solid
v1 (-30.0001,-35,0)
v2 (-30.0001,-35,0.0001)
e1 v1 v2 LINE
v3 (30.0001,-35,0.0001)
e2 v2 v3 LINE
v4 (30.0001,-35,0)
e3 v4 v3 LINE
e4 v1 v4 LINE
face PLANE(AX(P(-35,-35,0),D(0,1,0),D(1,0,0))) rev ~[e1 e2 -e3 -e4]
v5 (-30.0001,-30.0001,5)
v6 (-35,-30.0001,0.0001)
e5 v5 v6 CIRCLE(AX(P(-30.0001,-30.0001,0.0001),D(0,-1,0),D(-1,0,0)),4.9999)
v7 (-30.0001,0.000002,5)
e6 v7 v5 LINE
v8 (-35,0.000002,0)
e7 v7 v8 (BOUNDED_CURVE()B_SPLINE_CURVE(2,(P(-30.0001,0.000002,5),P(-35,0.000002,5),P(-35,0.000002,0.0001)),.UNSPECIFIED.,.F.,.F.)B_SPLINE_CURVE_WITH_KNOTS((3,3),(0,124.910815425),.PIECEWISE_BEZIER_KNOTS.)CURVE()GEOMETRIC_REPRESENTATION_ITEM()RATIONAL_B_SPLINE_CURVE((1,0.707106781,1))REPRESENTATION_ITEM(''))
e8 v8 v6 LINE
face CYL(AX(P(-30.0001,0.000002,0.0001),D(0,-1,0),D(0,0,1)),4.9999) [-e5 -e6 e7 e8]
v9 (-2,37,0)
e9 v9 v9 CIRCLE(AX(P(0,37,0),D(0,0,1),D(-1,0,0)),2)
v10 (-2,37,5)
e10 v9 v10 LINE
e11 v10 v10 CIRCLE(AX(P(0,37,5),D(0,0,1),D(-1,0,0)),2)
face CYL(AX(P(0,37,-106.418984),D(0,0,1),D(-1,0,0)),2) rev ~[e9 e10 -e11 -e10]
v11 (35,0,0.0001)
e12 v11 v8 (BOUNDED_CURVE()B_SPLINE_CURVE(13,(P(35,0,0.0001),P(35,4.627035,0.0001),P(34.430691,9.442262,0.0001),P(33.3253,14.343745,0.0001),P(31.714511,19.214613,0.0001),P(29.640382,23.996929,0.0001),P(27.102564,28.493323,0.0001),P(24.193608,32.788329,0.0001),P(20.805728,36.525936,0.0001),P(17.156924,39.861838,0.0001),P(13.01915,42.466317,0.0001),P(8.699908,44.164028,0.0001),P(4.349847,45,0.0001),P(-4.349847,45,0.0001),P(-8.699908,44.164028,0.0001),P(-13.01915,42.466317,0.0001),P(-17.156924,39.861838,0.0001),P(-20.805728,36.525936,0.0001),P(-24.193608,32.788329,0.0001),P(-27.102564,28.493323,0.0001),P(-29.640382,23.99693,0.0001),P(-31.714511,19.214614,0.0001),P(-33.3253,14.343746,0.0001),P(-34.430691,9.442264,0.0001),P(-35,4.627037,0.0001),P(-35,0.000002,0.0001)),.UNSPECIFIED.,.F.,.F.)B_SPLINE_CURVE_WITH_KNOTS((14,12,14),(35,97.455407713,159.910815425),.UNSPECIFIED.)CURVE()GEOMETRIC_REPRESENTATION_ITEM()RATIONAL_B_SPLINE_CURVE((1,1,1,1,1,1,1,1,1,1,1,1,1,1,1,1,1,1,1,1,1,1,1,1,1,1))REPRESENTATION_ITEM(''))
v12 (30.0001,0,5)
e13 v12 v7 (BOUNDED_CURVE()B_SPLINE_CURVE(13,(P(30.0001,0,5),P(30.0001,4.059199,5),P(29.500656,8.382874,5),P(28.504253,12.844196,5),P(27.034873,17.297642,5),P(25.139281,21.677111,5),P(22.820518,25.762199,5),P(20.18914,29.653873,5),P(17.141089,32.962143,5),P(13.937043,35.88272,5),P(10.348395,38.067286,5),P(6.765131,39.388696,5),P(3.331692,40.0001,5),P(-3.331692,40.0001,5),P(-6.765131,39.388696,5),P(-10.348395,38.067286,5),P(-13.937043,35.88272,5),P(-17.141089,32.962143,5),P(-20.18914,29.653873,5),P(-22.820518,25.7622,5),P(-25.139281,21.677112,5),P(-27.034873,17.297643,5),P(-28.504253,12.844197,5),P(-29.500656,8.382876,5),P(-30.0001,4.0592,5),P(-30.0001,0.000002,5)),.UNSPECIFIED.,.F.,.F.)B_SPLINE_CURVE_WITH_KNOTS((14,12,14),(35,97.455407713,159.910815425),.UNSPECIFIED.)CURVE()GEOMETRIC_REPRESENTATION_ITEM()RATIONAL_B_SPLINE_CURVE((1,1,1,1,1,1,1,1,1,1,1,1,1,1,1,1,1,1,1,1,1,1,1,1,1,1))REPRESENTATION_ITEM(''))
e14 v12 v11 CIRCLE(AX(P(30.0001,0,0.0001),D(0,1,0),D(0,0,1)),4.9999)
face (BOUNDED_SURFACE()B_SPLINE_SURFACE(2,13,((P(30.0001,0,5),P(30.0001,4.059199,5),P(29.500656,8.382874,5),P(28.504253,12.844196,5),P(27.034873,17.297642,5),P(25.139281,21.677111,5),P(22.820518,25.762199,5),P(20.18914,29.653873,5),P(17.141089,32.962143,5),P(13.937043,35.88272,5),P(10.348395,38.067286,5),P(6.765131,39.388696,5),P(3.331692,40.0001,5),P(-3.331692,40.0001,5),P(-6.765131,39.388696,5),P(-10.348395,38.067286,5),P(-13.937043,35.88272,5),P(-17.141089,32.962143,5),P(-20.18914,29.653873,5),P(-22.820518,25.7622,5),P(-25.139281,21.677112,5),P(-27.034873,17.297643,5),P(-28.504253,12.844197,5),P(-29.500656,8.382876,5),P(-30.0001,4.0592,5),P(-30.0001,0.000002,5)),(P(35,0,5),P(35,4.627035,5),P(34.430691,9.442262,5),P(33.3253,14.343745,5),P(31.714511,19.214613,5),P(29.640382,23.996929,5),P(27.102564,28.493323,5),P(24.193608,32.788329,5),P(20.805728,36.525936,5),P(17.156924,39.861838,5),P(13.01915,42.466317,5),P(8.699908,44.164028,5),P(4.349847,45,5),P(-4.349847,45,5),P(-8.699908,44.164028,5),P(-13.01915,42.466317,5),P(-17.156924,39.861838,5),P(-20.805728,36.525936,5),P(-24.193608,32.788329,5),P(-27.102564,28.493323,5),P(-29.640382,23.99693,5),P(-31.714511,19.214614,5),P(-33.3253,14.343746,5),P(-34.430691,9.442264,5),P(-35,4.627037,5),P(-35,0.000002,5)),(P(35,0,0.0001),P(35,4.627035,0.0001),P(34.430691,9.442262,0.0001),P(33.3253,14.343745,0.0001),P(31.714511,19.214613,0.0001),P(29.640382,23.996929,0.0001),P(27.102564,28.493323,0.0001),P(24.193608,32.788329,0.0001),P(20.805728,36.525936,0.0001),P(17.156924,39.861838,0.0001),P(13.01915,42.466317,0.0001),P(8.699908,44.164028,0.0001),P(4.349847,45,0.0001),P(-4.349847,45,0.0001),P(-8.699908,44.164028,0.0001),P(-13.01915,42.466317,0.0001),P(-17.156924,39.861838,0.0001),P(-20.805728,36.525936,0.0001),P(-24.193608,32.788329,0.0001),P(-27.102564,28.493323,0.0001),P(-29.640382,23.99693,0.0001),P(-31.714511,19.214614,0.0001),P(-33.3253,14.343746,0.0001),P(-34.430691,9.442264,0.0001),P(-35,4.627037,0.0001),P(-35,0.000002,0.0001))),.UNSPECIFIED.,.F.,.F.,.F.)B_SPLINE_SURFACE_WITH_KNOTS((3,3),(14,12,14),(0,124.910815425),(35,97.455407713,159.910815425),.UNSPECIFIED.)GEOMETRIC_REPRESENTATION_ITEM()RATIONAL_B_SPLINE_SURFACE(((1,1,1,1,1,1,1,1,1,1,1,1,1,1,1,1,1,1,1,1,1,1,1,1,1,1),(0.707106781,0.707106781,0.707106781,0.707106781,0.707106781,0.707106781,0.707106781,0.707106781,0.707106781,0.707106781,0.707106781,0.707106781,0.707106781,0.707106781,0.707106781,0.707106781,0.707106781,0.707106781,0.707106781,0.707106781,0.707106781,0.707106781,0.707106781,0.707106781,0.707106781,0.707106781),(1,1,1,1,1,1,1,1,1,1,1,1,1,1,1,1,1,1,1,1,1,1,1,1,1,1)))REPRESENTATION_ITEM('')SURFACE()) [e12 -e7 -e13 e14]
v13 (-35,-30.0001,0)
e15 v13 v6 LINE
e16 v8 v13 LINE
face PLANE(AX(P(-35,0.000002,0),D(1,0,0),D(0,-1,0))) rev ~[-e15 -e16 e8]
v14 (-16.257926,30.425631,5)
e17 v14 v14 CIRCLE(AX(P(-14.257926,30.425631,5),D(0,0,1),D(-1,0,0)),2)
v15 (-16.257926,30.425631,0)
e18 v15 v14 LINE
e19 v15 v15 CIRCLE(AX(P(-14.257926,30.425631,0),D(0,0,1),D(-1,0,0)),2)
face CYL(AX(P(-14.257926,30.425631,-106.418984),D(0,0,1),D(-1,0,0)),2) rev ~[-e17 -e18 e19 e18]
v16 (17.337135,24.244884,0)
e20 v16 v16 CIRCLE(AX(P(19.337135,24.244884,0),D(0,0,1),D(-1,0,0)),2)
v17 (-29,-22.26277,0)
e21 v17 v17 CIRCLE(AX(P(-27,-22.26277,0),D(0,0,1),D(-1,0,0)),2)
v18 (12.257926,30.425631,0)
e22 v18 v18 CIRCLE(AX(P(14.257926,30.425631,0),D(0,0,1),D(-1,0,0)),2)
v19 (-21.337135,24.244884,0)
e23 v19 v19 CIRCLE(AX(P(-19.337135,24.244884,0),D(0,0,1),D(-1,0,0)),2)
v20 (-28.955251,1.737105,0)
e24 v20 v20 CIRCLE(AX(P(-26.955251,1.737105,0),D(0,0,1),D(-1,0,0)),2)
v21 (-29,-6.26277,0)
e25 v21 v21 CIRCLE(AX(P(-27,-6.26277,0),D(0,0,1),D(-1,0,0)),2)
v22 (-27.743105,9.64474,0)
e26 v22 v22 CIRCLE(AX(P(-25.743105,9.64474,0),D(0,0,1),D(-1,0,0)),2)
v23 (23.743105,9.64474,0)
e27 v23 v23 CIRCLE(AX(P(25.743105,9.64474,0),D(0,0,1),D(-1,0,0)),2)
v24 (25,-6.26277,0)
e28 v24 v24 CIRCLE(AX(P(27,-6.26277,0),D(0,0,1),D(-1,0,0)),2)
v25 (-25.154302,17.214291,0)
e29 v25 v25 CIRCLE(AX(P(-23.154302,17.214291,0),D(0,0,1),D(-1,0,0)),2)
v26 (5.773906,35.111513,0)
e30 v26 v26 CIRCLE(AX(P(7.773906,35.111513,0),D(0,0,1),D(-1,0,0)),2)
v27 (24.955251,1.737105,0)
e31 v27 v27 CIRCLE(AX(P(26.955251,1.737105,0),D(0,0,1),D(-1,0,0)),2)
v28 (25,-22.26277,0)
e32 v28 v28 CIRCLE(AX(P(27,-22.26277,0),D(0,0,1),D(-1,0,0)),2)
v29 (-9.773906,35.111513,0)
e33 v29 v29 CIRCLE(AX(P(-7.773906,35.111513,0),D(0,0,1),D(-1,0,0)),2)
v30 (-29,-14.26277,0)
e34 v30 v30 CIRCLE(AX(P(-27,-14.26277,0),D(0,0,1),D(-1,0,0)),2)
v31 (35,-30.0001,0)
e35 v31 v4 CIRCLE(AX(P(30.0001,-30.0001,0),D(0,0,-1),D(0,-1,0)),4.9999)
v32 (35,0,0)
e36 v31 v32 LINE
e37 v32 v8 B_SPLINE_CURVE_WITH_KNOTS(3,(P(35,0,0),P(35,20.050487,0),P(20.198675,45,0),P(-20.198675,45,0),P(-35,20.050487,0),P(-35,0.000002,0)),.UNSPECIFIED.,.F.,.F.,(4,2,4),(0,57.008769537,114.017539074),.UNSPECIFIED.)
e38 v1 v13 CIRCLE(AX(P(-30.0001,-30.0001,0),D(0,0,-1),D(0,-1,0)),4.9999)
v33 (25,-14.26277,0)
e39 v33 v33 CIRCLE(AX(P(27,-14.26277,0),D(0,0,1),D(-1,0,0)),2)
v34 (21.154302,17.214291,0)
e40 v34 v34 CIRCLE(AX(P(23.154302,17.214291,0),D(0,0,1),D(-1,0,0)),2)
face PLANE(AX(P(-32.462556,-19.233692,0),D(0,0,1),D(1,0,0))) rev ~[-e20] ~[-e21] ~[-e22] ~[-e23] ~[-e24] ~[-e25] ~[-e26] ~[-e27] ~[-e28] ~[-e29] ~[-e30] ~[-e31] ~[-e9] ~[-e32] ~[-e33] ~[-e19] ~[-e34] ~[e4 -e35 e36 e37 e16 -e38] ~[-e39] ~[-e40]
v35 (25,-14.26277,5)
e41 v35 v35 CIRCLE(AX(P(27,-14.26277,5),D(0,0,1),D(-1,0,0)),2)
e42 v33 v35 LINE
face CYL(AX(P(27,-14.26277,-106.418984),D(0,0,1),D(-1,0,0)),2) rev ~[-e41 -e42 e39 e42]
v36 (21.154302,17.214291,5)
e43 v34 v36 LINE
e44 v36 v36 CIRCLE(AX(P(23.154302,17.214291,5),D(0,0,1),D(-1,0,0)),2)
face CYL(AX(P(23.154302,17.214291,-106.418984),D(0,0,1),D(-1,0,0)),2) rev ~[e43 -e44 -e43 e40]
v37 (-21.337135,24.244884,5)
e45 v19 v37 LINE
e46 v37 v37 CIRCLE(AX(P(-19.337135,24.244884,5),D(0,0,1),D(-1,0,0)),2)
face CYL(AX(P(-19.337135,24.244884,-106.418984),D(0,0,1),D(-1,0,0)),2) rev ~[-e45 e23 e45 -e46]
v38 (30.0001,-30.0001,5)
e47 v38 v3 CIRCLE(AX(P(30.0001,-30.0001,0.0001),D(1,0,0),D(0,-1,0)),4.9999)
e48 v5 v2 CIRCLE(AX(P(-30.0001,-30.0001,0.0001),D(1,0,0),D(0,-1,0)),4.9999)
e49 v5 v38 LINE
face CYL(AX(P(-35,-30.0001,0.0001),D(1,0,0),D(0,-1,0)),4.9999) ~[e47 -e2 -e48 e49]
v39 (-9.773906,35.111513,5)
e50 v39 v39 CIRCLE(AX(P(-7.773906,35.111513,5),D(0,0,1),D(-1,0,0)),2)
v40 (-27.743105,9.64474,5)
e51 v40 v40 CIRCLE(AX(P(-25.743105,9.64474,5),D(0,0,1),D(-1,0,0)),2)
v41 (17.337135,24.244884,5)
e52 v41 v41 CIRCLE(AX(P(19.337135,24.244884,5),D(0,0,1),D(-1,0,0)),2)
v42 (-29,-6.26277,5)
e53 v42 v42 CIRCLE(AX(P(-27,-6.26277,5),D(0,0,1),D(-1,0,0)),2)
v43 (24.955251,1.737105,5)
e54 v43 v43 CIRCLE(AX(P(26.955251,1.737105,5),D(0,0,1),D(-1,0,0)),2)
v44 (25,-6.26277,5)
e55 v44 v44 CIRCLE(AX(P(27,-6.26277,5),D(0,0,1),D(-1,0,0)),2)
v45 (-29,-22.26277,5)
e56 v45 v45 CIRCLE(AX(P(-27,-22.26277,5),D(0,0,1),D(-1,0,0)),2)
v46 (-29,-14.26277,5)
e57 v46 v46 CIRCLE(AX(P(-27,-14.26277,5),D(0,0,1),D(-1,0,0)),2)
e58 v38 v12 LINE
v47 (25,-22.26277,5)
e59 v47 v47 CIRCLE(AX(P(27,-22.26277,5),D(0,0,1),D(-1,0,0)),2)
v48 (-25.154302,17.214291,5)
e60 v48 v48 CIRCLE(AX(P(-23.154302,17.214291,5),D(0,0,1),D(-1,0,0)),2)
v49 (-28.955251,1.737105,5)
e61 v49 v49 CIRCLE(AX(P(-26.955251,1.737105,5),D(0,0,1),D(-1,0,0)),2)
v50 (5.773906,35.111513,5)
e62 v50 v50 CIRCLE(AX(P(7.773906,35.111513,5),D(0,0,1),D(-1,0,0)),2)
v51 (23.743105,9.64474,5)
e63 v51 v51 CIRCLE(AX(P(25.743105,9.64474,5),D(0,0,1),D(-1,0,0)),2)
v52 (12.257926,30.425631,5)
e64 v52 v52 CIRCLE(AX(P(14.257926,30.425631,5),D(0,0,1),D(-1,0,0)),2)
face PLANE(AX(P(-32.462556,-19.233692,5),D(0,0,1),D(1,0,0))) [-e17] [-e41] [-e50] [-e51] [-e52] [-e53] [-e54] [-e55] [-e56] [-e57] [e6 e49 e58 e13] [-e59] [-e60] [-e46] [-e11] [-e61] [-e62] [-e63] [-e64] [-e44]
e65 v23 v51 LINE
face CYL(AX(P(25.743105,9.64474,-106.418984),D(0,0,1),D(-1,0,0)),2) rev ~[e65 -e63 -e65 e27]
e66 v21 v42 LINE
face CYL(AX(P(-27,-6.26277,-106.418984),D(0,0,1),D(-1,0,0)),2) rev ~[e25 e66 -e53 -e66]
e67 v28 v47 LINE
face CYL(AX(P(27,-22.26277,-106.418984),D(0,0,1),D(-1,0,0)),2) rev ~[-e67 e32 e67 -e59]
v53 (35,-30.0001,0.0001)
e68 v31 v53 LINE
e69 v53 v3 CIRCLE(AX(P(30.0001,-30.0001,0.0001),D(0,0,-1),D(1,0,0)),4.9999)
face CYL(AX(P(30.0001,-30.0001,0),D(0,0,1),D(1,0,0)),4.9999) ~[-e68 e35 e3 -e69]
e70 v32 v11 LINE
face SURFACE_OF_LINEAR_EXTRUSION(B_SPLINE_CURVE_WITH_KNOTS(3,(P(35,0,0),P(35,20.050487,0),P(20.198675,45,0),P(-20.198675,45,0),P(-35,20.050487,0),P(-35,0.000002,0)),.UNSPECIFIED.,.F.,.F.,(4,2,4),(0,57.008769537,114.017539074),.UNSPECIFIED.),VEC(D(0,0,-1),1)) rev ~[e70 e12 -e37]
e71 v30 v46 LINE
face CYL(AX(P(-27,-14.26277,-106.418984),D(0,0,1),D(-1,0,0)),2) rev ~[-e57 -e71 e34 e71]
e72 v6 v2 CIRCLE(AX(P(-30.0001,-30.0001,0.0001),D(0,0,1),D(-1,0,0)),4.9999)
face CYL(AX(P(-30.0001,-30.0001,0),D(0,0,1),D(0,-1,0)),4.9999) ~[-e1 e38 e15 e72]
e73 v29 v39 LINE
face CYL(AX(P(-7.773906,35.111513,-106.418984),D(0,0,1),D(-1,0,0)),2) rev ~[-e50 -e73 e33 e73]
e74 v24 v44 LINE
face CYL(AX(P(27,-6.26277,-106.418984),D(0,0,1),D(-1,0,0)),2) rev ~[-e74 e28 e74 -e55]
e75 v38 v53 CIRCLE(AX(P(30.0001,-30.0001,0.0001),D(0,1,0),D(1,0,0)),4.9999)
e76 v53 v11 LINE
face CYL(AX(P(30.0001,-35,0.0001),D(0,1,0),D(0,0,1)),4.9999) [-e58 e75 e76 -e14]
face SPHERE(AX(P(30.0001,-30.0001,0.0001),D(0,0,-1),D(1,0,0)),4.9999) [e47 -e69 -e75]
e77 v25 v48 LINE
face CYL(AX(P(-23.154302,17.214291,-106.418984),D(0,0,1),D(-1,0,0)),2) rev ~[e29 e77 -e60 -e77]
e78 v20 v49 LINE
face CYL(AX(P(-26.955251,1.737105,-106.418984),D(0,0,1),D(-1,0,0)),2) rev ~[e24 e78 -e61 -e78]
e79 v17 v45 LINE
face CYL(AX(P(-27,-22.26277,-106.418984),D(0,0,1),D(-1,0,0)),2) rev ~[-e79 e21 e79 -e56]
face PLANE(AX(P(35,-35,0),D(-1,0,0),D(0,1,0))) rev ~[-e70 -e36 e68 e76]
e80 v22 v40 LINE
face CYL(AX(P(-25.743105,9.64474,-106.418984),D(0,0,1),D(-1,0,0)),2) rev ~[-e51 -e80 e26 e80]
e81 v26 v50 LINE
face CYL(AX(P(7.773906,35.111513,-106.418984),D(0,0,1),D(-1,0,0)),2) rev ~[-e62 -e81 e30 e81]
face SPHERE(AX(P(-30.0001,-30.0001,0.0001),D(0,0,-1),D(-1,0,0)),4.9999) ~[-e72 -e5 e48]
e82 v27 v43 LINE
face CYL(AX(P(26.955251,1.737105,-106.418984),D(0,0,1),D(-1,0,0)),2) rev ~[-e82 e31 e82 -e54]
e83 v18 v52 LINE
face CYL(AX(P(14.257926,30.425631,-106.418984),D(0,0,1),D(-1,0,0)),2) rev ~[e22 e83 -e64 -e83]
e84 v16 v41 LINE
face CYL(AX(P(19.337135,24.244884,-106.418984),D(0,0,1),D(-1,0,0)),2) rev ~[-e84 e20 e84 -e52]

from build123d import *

# Parameters (mm, degrees)
F1_DEPTH = 5
F2_D     = 4
F3_R     = 4.9999


# Not quite as in the source:
# - a fillet or chamfer is up to 0.001 mm smaller than in the source, because OpenCascade refuses the exact size
# - ends of sketch curves that miss each other by under 0.0002 mm in the source are joined


with BuildPart() as f1:
    # F0 (on Top) → F1 (new body)
    with BuildSketch(Plane.XY):
        with BuildLine():
            Line((-35, 2.1762e-06), (-35, -35))
            Line((-35, -35), (-27, -35))
            Line((-27, -35), (-27, -22.2710574513))
            ThreePointArc((-27, -22.2710574513), (-32.9393385518, -11.8321585422), (-35, 2.1762e-06))
        make_face()
        with BuildLine():
            Line((-27, -22.2710574513), (-27, -35))
            Line((-27, -35), (0, -35))
            ThreePointArc((0, -35), (-14.9250291324, -31.658229663), (-27, -22.2710574513))
        make_face()
        with BuildLine():
            add(Edge.make_bspline(
                [(0, 45), (-20.1986748725, 45), (-35, 20.0504870868), (-35, 2.1762e-06)],
                knots=[0, 0, 0, 0, 57.0087695372, 57.0087695372, 57.0087695372, 57.0087695372], degree=3))
            ThreePointArc((-35, 2.1762e-06), (-28.4666369261, 20.3629708568), (-11.3056830814, 33.1237306181))
            add(Edge.make_bspline(
                [(0, 37), (-0.2833414452, 37.0069688983), (-1.1232932293, 37.0068386903), (-2.7957299856, 36.8864035146), (-4.9942322029, 36.3521195303), (-7.6997383876, 35.2871018647), (-9.7958540485, 34.148638444), (-11.0540635502, 33.3003360386), (-11.3056830814, 33.1237306181)],
                knots=[0, 0, 0, 0, 0.8506820357, 2.5185967411, 5.0181648841, 7.6012051941, 11.2266191262, 12.1476935207, 12.1476935207, 12.1476935207, 12.1476935207], degree=3))
            add(Edge.make_bspline(
                [(0, 37), (0.2833414452, 37.0069688983), (1.1232932293, 37.0068386903), (2.7957299856, 36.8864035146), (4.9942322029, 36.3521195303), (7.6997383876, 35.2871018647), (9.7958540485, 34.148638444), (11.0540635502, 33.3003360386), (11.3056830814, 33.1237306181)],
                knots=[0, 0, 0, 0, 0.8506820357, 2.5185967411, 5.0181648841, 7.6012051941, 11.2266191262, 12.1476935207, 12.1476935207, 12.1476935207, 12.1476935207], degree=3))
            ThreePointArc((11.3056830814, 33.1237306181), (28.4666375592, 20.3629699719), (35, 0))
            add(Edge.make_bspline(
                [(0, 45), (20.1986748725, 45), (35, 20.0504870868), (35, 0)],
                knots=[0, 0, 0, 0, 57.0087695372, 57.0087695372, 57.0087695372, 57.0087695372], degree=3))
        make_face()
        with BuildLine():
            ThreePointArc((-11.3056830814, 33.1237306181), (-28.4666369261, 20.3629708568), (-35, 2.1762e-06))
            ThreePointArc((-35, 2.1762e-06), (-32.9393385518, -11.8321585422), (-27, -22.2710574513))
            Line((-27, -22.2710574513), (-27, 2.1762e-06))
            add(Edge.make_bspline(
                [(-11.3056830814, 33.1237306181), (-12.4097508436, 32.3488132243), (-15.1414824386, 30.0752135158), (-18.8876274503, 25.5283101279), (-22.422035633, 19.604279738), (-25.0662594291, 13.1120426553), (-26.6478130576, 7.1844788974), (-27.0173066601, 2.7756083867), (-27.018694794, 0.6711028041), (-27, 2.1762e-06)],
                knots=[12.1476935207, 12.1476935207, 12.1476935207, 12.1476935207, 16.189226149, 22.7543847852, 29.7183326598, 36.8091409701, 43.7289829573, 48.0262708445, 50.0404462243, 50.0404462243, 50.0404462243, 50.0404462243], degree=3))
        make_face()
        with BuildLine():
            ThreePointArc((27, -22.2710574513), (14.9250291324, -31.658229663), (0, -35))
            Line((0, -35), (27, -35))
            Line((27, -35), (27, -22.2710574513))
        make_face()
        with BuildLine():
            ThreePointArc((-27, -22.2710574513), (-14.9250291324, -31.658229663), (0, -35))
            ThreePointArc((0, -35), (14.9250291324, -31.658229663), (27, -22.2710574513))
            Line((27, -22.2710574513), (27, 2.1762e-06))
            add(Edge.make_bspline(
                [(11.3056830814, 33.1237306181), (12.4097508436, 32.3488132243), (15.1414824386, 30.0752135158), (18.8876274503, 25.5283101279), (22.422035633, 19.604279738), (25.0662594291, 13.1120426553), (26.6478130576, 7.1844788974), (27.0173066601, 2.7756083867), (27.018694794, 0.6711028041), (27, 2.1762e-06)],
                knots=[12.1476935207, 12.1476935207, 12.1476935207, 12.1476935207, 16.189226149, 22.7543847852, 29.7183326598, 36.8091409701, 43.7289829573, 48.0262708445, 50.0404462243, 50.0404462243, 50.0404462243, 50.0404462243], degree=3))
            ThreePointArc((11.3056830814, 33.1237306181), (0, 35), (-11.3056830814, 33.1237306181))
            add(Edge.make_bspline(
                [(-11.3056830814, 33.1237306181), (-12.4097508436, 32.3488132243), (-15.1414824386, 30.0752135158), (-18.8876274503, 25.5283101279), (-22.422035633, 19.604279738), (-25.0662594291, 13.1120426553), (-26.6478130576, 7.1844788974), (-27.0173066601, 2.7756083867), (-27.018694794, 0.6711028041), (-27, 2.1762e-06)],
                knots=[12.1476935207, 12.1476935207, 12.1476935207, 12.1476935207, 16.189226149, 22.7543847852, 29.7183326598, 36.8091409701, 43.7289829573, 48.0262708445, 50.0404462243, 50.0404462243, 50.0404462243, 50.0404462243], degree=3))
            Line((-27, 2.1762e-06), (-27, -22.2710574513))
        make_face()
        with BuildLine():
            Line((27, -22.2710574513), (27, -35))
            Line((27, -35), (35, -35))
            Line((35, -35), (35, 0))
            ThreePointArc((35, 0), (32.939338184, -11.8321595662), (27, -22.2710574513))
        make_face()
        with BuildLine():
            Line((27, 2.1762e-06), (27, -22.2710574513))
            ThreePointArc((27, -22.2710574513), (32.939338184, -11.8321595662), (35, 0))
            ThreePointArc((35, 0), (28.4666375592, 20.3629699719), (11.3056830814, 33.1237306181))
            add(Edge.make_bspline(
                [(11.3056830814, 33.1237306181), (12.4097508436, 32.3488132243), (15.1414824386, 30.0752135158), (18.8876274503, 25.5283101279), (22.422035633, 19.604279738), (25.0662594291, 13.1120426553), (26.6478130576, 7.1844788974), (27.0173066601, 2.7756083867), (27.018694794, 0.6711028041), (27, 2.1762e-06)],
                knots=[12.1476935207, 12.1476935207, 12.1476935207, 12.1476935207, 16.189226149, 22.7543847852, 29.7183326598, 36.8091409701, 43.7289829573, 48.0262708445, 50.0404462243, 50.0404462243, 50.0404462243, 50.0404462243], degree=3))
        make_face()
        with BuildLine():
            add(Edge.make_bspline(
                [(0, 37), (-0.2833414452, 37.0069688983), (-1.1232932293, 37.0068386903), (-2.7957299856, 36.8864035146), (-4.9942322029, 36.3521195303), (-7.6997383876, 35.2871018647), (-9.7958540485, 34.148638444), (-11.0540635502, 33.3003360386), (-11.3056830814, 33.1237306181)],
                knots=[0, 0, 0, 0, 0.8506820357, 2.5185967411, 5.0181648841, 7.6012051941, 11.2266191262, 12.1476935207, 12.1476935207, 12.1476935207, 12.1476935207], degree=3))
            ThreePointArc((-11.3056830814, 33.1237306181), (0, 35), (11.3056830814, 33.1237306181))
            add(Edge.make_bspline(
                [(0, 37), (0.2833414452, 37.0069688983), (1.1232932293, 37.0068386903), (2.7957299856, 36.8864035146), (4.9942322029, 36.3521195303), (7.6997383876, 35.2871018647), (9.7958540485, 34.148638444), (11.0540635502, 33.3003360386), (11.3056830814, 33.1237306181)],
                knots=[0, 0, 0, 0, 0.8506820357, 2.5185967411, 5.0181648841, 7.6012051941, 11.2266191262, 12.1476935207, 12.1476935207, 12.1476935207, 12.1476935207], degree=3))
        make_face()
    extrude(amount=F1_DEPTH)

    # F2 (through all)
    with Locations(Plane(origin=(0, 0, 0), x_dir=(1, 0, 0), z_dir=(0, 0, -1))):
        with Locations((0, -37), (-7.7739062126, -35.111513252), (-14.2579257305, -30.4256311694), (-19.3371352018, -24.244884358), (-23.1543015859, -17.2142911543), (-25.7431047524, -9.6447404302), (-26.9552512695, -1.7371048277), (-27, 6.2627700182), (-27, 14.2627700182), (-27, 22.2627700182), (7.7739062126, -35.111513252), (14.2579257305, -30.4256311694), (19.3371352018, -24.244884358), (23.1543015859, -17.2142911543), (25.7431047524, -9.6447404302), (26.9552512695, -1.7371048277), (27, 6.2627700182), (27, 14.2627700182), (27, 22.2627700182)):
            Hole(F2_D / 2)

    # F3 (radius 5 in the source; OpenCascade refuses exactly that, so slightly less here)
    f3_edges = [f1.edges().sort_by_distance(p)[0] for p in [
        (-35, -35, 2.5),
        (35, -35, 2.5),
        (-35, -17.499999, 5),
        (0, -35, 5),
    ]]
    fillet(f3_edges, radius=F3_R)


solid = f1.part
